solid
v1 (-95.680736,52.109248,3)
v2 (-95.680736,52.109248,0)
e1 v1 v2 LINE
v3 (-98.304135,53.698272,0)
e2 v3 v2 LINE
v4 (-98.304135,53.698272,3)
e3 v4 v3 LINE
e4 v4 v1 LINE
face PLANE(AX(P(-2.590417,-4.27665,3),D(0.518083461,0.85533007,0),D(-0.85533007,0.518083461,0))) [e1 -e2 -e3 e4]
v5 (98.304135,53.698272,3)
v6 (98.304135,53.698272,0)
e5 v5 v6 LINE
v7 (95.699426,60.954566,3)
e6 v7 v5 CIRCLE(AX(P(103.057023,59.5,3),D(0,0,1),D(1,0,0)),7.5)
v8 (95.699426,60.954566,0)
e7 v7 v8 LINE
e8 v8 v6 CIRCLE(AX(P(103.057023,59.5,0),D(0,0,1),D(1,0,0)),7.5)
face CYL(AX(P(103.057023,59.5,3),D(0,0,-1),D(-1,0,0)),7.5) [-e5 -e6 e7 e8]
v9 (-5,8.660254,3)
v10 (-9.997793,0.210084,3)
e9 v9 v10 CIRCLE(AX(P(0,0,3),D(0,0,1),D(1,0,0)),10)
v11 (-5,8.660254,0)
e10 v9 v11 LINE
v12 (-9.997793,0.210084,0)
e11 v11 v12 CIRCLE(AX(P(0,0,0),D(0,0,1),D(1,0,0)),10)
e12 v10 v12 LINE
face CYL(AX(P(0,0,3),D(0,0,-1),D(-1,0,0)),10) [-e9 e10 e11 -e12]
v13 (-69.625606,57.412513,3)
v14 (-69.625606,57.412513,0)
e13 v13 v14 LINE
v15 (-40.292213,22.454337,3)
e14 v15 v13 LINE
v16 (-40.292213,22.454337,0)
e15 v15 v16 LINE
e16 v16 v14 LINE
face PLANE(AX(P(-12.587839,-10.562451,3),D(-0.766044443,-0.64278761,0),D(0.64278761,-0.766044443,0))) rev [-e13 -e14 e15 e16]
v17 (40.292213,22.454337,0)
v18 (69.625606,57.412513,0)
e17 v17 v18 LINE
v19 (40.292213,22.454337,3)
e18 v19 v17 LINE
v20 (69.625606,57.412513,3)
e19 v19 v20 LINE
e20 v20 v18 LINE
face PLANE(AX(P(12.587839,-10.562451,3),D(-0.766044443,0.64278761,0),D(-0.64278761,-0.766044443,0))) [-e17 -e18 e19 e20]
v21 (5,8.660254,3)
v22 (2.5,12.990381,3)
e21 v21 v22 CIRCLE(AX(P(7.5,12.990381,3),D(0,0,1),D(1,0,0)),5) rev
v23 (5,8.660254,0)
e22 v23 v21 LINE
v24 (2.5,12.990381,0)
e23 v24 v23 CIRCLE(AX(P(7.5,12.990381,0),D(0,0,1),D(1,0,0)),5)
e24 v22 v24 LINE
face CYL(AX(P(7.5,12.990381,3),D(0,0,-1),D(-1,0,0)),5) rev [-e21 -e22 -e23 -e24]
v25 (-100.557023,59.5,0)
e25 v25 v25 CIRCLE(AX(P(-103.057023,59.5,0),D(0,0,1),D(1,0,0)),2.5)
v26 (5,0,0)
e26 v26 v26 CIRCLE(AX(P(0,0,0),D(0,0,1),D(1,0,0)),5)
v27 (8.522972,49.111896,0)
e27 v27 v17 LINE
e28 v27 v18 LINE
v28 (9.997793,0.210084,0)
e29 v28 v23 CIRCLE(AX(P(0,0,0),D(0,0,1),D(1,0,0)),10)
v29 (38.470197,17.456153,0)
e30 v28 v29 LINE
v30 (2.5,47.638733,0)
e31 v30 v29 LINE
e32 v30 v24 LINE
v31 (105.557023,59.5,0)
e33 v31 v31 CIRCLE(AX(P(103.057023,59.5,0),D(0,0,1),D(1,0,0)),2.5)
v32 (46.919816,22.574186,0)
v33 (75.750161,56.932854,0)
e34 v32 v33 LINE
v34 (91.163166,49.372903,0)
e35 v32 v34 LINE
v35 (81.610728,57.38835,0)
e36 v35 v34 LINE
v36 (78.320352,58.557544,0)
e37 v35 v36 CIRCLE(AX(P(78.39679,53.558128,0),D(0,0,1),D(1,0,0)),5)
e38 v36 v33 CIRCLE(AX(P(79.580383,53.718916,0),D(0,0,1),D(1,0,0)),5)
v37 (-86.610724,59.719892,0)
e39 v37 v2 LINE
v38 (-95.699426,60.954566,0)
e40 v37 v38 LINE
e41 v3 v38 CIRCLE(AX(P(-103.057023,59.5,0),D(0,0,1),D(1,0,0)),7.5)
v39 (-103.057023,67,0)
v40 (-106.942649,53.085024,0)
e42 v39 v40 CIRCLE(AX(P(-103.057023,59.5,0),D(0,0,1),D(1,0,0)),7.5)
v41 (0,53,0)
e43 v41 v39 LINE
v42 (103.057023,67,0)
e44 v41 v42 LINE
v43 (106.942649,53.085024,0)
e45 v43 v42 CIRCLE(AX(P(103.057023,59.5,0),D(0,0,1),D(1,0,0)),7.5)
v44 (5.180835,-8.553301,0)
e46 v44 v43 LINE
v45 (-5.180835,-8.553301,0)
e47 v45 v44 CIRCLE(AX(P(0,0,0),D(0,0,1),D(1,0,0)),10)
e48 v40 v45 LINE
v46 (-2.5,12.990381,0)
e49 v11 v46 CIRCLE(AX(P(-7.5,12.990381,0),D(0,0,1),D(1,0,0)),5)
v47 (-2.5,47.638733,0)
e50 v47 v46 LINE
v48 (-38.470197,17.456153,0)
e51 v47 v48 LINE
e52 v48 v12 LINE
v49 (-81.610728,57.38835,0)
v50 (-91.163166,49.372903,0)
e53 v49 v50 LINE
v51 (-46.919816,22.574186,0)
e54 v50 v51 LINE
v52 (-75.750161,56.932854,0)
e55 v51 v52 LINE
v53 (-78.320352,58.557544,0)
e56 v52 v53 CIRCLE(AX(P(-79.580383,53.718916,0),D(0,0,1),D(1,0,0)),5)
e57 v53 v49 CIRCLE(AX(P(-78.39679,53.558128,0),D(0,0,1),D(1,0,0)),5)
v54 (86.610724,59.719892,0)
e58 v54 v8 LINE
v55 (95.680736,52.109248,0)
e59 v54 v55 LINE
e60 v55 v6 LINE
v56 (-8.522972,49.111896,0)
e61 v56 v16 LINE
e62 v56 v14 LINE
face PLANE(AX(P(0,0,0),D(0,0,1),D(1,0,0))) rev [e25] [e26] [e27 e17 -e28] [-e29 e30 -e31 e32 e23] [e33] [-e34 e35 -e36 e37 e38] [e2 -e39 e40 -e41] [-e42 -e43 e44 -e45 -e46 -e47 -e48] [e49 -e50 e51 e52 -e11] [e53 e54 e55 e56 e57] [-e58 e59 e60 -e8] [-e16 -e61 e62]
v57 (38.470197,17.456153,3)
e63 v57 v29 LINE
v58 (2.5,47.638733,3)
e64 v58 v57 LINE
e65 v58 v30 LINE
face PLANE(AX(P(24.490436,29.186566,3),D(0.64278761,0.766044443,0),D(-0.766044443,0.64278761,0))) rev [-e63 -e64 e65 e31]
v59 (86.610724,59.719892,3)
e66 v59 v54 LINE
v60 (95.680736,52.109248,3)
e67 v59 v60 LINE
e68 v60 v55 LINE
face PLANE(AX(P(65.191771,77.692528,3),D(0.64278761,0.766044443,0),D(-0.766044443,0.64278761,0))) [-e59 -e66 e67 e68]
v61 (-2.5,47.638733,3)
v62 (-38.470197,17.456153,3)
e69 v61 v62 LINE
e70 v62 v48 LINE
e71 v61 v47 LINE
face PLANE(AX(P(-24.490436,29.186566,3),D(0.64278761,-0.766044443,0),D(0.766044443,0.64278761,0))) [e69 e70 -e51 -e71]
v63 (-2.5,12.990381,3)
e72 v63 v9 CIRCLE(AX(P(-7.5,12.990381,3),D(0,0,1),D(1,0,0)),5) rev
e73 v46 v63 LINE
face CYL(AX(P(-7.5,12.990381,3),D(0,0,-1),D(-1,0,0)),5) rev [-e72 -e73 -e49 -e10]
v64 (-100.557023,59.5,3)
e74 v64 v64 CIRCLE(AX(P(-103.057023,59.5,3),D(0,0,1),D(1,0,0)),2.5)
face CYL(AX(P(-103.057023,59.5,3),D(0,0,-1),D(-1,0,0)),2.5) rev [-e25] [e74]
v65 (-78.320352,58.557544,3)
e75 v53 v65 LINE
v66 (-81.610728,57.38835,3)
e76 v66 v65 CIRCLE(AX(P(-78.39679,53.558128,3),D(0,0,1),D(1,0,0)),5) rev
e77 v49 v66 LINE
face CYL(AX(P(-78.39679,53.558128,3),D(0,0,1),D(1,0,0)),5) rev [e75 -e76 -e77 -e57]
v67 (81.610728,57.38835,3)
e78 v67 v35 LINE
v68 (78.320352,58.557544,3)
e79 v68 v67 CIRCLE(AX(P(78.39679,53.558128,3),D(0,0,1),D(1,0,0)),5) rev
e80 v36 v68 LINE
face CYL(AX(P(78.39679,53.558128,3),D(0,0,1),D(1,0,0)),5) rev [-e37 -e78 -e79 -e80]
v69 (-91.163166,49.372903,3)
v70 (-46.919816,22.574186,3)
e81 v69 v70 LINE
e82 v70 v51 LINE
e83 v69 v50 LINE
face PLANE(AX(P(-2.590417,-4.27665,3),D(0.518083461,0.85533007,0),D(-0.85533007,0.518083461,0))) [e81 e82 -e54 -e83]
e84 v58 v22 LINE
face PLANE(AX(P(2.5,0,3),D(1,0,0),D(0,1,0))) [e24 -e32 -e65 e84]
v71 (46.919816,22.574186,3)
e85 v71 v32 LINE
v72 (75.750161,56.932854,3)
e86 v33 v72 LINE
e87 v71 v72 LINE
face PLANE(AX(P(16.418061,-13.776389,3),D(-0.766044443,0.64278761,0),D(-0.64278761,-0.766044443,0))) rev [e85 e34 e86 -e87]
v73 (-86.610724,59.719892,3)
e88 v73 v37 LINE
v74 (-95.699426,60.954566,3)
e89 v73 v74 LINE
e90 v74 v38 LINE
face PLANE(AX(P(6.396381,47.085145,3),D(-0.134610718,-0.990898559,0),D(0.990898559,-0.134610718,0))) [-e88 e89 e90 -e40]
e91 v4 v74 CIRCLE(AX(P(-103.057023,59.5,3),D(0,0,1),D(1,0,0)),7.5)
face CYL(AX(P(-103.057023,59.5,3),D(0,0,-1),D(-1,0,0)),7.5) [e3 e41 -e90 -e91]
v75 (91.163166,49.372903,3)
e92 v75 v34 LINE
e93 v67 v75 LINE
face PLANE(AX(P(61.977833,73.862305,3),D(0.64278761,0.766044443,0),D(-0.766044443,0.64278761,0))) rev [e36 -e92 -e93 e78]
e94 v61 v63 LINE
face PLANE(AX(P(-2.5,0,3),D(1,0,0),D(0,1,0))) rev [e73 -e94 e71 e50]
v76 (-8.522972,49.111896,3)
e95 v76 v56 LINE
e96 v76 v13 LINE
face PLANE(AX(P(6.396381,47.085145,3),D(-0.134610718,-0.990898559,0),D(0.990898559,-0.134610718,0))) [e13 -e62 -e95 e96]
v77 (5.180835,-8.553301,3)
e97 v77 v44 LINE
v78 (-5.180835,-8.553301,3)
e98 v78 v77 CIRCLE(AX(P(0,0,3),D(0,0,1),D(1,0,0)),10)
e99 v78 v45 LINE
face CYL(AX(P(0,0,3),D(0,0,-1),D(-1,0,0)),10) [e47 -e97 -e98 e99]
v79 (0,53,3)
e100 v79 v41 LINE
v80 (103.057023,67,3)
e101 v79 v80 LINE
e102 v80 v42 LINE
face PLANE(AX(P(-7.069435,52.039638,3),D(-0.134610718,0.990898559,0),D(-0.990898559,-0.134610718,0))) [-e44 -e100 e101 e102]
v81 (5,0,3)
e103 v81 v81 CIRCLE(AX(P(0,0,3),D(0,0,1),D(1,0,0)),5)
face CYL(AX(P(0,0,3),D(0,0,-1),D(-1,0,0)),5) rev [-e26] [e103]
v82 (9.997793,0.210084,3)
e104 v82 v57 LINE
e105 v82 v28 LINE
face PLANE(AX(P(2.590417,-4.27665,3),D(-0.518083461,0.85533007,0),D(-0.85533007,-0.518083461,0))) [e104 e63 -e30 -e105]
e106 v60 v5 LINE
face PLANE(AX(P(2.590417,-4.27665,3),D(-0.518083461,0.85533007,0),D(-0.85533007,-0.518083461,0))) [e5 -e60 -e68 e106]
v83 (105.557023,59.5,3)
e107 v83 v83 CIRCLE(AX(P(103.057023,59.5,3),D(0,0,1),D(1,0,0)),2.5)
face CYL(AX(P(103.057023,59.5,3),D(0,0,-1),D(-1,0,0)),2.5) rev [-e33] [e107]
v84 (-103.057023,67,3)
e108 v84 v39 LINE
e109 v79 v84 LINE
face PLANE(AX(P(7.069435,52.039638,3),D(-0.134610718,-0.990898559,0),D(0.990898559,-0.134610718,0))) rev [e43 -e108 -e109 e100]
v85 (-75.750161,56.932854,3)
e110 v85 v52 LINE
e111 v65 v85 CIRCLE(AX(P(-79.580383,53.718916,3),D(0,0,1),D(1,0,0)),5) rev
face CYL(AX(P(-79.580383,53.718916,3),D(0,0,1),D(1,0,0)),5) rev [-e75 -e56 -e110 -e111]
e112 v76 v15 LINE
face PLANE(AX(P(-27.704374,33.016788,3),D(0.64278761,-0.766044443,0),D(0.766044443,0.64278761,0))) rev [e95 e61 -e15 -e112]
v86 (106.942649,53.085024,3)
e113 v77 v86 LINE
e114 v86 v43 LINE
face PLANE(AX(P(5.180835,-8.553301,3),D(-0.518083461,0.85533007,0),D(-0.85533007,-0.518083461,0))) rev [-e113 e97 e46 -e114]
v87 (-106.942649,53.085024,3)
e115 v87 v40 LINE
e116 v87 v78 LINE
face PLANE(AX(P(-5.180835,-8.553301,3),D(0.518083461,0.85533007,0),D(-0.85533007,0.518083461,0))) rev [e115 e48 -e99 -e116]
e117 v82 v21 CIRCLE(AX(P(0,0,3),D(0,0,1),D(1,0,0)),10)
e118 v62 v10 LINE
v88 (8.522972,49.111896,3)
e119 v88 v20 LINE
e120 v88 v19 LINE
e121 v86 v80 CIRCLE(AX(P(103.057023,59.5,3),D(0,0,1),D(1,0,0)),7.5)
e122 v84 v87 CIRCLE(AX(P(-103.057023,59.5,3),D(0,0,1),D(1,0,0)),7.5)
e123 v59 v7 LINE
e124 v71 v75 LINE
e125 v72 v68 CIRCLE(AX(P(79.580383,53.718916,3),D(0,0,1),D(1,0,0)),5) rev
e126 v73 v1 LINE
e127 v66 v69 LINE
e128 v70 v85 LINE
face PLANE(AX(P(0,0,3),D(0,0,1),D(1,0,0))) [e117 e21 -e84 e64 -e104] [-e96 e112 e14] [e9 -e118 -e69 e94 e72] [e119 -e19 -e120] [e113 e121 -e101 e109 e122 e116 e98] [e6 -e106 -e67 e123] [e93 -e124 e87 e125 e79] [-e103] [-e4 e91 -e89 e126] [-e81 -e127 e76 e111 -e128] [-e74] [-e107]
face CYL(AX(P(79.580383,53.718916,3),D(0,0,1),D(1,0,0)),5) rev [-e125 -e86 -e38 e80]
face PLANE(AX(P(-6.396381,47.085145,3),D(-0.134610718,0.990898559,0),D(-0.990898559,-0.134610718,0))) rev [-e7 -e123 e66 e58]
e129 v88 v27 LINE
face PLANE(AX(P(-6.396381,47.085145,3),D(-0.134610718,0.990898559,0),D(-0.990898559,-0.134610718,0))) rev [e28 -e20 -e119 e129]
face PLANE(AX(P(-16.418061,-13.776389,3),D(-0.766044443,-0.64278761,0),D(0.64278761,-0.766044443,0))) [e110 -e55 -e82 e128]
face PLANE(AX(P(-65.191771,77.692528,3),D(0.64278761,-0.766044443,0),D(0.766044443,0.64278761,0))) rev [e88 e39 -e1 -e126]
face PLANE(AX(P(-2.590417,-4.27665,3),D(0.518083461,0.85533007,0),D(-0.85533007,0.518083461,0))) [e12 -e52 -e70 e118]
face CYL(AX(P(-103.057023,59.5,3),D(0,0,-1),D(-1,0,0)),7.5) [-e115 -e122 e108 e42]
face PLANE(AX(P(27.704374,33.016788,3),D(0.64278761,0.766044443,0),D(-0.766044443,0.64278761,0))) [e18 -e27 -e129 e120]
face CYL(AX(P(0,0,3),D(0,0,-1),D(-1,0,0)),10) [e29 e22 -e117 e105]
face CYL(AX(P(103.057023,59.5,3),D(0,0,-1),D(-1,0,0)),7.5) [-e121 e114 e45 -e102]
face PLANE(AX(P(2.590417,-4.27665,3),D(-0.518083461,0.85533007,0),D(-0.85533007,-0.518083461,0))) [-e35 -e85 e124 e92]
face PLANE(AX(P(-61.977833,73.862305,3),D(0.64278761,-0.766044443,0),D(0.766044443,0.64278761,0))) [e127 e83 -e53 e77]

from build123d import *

# Parameters (mm, degrees)
SKETCH_1_R      = 5
EXTRUDE_1_DEPTH = 3
FILLET_1_R      = 5
FILLET_2_R      = 5
FILLET_3_R      = 5


with BuildPart() as part:
    # 草图1 → 凸台-拉伸1 (new body)
    with BuildSketch(Plane.XY):
        with BuildLine():
            Line((101.056239558, 66.72819932), (0, 53))
            Line((0, 53), (-101.056239558, 66.72819932))
            Line((-101.056239558, 66.72819932), (-103.05702305, 67))
            ThreePointArc((-103.05702305, 67), (-110.280675742, 61.517137029), (-106.942649005, 53.085024478))
            Line((-106.942649005, 53.085024478), (-5.180834606, -8.553300696))
            ThreePointArc((-5.180834606, -8.553300696), (-3.881694774, -9.215880082), (-2.5, -9.682458366))
            ThreePointArc((-2.5, -9.682458366), (0, -10), (2.5, -9.682458366))
            ThreePointArc((2.5, -9.682458366), (3.881694774, -9.215880082), (5.180834606, -8.553300696))
            Line((5.180834606, -8.553300696), (106.942649005, 53.085024478))
            ThreePointArc((106.942649005, 53.085024478), (110.280675742, 61.517137029), (103.05702305, 67))
            Line((103.05702305, 67), (101.056239558, 66.72819932))
        make_face()
        Circle(SKETCH_1_R, mode=Mode.SUBTRACT)
        with BuildLine():
            Line((-38.470197272, 17.456153435), (-2.5, 47.638732699))
            Line((-2.5, 47.638732699), (-2.5, 9.682458366))
            ThreePointArc((-2.5, 9.682458366), (-7.840929555, 6.206434058), (-9.997792991, 0.210084034))
            Line((-9.997792991, 0.210084034), (-38.470197272, 17.456153435))
        make_face(mode=Mode.SUBTRACT)
        with BuildLine():
            Line((38.470197272, 17.456153435), (9.997792991, 0.210084034))
            ThreePointArc((9.997792991, 0.210084034), (7.840929555, 6.206434058), (2.5, 9.682458366))
            Line((2.5, 9.682458366), (2.5, 47.638732699))
            Line((2.5, 47.638732699), (38.470197272, 17.456153435))
        make_face(mode=Mode.SUBTRACT)
        Polygon((-76.992375251, 58.413267417), (-46.919815599, 22.574186413), (-91.163166243, 49.372903102), (-79.915961764, 58.810428231), align=None, mode=Mode.SUBTRACT)
        Polygon((-69.625606174, 57.412513038), (-8.52297152, 49.111895964), (-40.292213402, 22.454336819), align=None, mode=Mode.SUBTRACT)
        with BuildLine():
            Line((-95.680736217, 52.109248249), (-98.304134778, 53.698271544))
            ThreePointArc((-98.304134778, 53.698271544), (-95.998027486, 56.966113336), (-95.699425849, 60.954566405))
            Line((-95.699425849, 60.954566405), (-86.610723734, 59.719892378))
            Line((-86.610723734, 59.719892378), (-95.680736217, 52.109248249))
        make_face(mode=Mode.SUBTRACT)
        with BuildLine():
            ThreePointArc((-103.304614869, 61.987709447), (-102.720496256, 61.977246398), (-102.154754916, 61.831504281))
            ThreePointArc((-102.154754916, 61.831504281), (-100.994782723, 60.913210824), (-100.55702305, 59.5))
            ThreePointArc((-100.55702305, 59.5), (-104.73497127, 57.646762354), (-103.304614869, 61.987709447))
        make_face(mode=Mode.SUBTRACT)
        Polygon((40.292213402, 22.454336819), (8.52297152, 49.111895964), (69.625606174, 57.412513038), align=None, mode=Mode.SUBTRACT)
        Polygon((91.163166243, 49.372903102), (46.919815599, 22.574186413), (76.992375251, 58.413267417), (79.915961764, 58.810428231), align=None, mode=Mode.SUBTRACT)
        with BuildLine():
            Line((95.680736217, 52.109248249), (86.610723734, 59.719892378))
            Line((86.610723734, 59.719892378), (95.699425849, 60.954566405))
            ThreePointArc((95.699425849, 60.954566405), (95.998027486, 56.966113336), (98.304134778, 53.698271544))
            Line((98.304134778, 53.698271544), (95.680736217, 52.109248249))
        make_face(mode=Mode.SUBTRACT)
        with BuildLine():
            ThreePointArc((105.55702305, 59.5), (101.643812227, 57.437759673), (102.154754916, 61.831504281))
            ThreePointArc((102.154754916, 61.831504281), (102.720496256, 61.977246398), (103.304614869, 61.987709447))
            ThreePointArc((103.304614869, 61.987709447), (104.910260696, 61.177948219), (105.55702305, 59.5))
        make_face(mode=Mode.SUBTRACT)
    extrude(amount=EXTRUDE_1_DEPTH)

    # 圆角1
    # the kernel refuses this fillet: 5 mm, written as the material it adds along each edge
    with BuildSketch(Plane(origin=(76.992375251, 58.413267417, 0), x_dir=(0.9908985592379703, 0.1346107176272178, 0), z_dir=(0, 0, 1))) as fillet_1_piece_1:
        with BuildLine():
            CenterArc((FILLET_1_R * 0.386508582556, -FILLET_1_R), FILLET_1_R, 90, 42.263889815)
            Line((-FILLET_1_R * 0.286037651021, -FILLET_1_R * 0.259944891443), (0, 0))
            Line((0, 0), (FILLET_1_R * 0.386508582556, 0))
        make_face()
    extrude(amount=3)
    with BuildSketch(Plane(origin=(79.915961764, 58.810428231, 0), x_dir=(0.7660444431189772, -0.6427876096865403, 0), z_dir=(0, 0, 1))) as fillet_1_piece_2:
        with BuildLine():
            CenterArc((FILLET_1_R * 0.442472138408, -FILLET_1_R), FILLET_1_R, 90, 47.736110185)
            Line((-FILLET_1_R * 0.297582970149, -FILLET_1_R * 0.327453766423), (0, 0))
            Line((0, 0), (FILLET_1_R * 0.442472138408, 0))
        make_face()
    extrude(amount=3)

    # 圆角2
    # the kernel refuses this fillet: 5 mm, written as the material it adds along each edge
    with BuildSketch(Plane(origin=(-79.915961764, 58.810428231, 0), x_dir=(0.9908985592379704, -0.13461071762721746, 0), z_dir=(0, 0, 1))) as fillet_2_piece_1:
        with BuildLine():
            CenterArc((FILLET_2_R * 0.442472138408, -FILLET_2_R), FILLET_2_R, 90, 47.736110185)
            Line((-FILLET_2_R * 0.297582970149, -FILLET_2_R * 0.327453766423), (0, 0))
            Line((0, 0), (FILLET_2_R * 0.442472138408, 0))
        make_face()
    extrude(amount=3)
    with BuildSketch(Plane(origin=(-76.992375251, 58.413267417, 0), x_dir=(0.642787609686538, -0.7660444431189791, 0), z_dir=(0, 0, 1))) as fillet_2_piece_2:
        with BuildLine():
            CenterArc((FILLET_2_R * 0.386508582556, -FILLET_2_R), FILLET_2_R, 90, 42.263889815)
            Line((-FILLET_2_R * 0.286037651021, -FILLET_2_R * 0.259944891443), (0, 0))
            Line((0, 0), (FILLET_2_R * 0.386508582556, 0))
        make_face()
    extrude(amount=3)

    # 圆角3
    fillet_3_edges = [part.edges().sort_by_distance(p)[0] for p in [
        (-2.5, 9.682458366, 1.5),
        (2.5, 9.682458366, 1.5),
    ]]
    fillet(fillet_3_edges, radius=FILLET_3_R)


solid = part.part
